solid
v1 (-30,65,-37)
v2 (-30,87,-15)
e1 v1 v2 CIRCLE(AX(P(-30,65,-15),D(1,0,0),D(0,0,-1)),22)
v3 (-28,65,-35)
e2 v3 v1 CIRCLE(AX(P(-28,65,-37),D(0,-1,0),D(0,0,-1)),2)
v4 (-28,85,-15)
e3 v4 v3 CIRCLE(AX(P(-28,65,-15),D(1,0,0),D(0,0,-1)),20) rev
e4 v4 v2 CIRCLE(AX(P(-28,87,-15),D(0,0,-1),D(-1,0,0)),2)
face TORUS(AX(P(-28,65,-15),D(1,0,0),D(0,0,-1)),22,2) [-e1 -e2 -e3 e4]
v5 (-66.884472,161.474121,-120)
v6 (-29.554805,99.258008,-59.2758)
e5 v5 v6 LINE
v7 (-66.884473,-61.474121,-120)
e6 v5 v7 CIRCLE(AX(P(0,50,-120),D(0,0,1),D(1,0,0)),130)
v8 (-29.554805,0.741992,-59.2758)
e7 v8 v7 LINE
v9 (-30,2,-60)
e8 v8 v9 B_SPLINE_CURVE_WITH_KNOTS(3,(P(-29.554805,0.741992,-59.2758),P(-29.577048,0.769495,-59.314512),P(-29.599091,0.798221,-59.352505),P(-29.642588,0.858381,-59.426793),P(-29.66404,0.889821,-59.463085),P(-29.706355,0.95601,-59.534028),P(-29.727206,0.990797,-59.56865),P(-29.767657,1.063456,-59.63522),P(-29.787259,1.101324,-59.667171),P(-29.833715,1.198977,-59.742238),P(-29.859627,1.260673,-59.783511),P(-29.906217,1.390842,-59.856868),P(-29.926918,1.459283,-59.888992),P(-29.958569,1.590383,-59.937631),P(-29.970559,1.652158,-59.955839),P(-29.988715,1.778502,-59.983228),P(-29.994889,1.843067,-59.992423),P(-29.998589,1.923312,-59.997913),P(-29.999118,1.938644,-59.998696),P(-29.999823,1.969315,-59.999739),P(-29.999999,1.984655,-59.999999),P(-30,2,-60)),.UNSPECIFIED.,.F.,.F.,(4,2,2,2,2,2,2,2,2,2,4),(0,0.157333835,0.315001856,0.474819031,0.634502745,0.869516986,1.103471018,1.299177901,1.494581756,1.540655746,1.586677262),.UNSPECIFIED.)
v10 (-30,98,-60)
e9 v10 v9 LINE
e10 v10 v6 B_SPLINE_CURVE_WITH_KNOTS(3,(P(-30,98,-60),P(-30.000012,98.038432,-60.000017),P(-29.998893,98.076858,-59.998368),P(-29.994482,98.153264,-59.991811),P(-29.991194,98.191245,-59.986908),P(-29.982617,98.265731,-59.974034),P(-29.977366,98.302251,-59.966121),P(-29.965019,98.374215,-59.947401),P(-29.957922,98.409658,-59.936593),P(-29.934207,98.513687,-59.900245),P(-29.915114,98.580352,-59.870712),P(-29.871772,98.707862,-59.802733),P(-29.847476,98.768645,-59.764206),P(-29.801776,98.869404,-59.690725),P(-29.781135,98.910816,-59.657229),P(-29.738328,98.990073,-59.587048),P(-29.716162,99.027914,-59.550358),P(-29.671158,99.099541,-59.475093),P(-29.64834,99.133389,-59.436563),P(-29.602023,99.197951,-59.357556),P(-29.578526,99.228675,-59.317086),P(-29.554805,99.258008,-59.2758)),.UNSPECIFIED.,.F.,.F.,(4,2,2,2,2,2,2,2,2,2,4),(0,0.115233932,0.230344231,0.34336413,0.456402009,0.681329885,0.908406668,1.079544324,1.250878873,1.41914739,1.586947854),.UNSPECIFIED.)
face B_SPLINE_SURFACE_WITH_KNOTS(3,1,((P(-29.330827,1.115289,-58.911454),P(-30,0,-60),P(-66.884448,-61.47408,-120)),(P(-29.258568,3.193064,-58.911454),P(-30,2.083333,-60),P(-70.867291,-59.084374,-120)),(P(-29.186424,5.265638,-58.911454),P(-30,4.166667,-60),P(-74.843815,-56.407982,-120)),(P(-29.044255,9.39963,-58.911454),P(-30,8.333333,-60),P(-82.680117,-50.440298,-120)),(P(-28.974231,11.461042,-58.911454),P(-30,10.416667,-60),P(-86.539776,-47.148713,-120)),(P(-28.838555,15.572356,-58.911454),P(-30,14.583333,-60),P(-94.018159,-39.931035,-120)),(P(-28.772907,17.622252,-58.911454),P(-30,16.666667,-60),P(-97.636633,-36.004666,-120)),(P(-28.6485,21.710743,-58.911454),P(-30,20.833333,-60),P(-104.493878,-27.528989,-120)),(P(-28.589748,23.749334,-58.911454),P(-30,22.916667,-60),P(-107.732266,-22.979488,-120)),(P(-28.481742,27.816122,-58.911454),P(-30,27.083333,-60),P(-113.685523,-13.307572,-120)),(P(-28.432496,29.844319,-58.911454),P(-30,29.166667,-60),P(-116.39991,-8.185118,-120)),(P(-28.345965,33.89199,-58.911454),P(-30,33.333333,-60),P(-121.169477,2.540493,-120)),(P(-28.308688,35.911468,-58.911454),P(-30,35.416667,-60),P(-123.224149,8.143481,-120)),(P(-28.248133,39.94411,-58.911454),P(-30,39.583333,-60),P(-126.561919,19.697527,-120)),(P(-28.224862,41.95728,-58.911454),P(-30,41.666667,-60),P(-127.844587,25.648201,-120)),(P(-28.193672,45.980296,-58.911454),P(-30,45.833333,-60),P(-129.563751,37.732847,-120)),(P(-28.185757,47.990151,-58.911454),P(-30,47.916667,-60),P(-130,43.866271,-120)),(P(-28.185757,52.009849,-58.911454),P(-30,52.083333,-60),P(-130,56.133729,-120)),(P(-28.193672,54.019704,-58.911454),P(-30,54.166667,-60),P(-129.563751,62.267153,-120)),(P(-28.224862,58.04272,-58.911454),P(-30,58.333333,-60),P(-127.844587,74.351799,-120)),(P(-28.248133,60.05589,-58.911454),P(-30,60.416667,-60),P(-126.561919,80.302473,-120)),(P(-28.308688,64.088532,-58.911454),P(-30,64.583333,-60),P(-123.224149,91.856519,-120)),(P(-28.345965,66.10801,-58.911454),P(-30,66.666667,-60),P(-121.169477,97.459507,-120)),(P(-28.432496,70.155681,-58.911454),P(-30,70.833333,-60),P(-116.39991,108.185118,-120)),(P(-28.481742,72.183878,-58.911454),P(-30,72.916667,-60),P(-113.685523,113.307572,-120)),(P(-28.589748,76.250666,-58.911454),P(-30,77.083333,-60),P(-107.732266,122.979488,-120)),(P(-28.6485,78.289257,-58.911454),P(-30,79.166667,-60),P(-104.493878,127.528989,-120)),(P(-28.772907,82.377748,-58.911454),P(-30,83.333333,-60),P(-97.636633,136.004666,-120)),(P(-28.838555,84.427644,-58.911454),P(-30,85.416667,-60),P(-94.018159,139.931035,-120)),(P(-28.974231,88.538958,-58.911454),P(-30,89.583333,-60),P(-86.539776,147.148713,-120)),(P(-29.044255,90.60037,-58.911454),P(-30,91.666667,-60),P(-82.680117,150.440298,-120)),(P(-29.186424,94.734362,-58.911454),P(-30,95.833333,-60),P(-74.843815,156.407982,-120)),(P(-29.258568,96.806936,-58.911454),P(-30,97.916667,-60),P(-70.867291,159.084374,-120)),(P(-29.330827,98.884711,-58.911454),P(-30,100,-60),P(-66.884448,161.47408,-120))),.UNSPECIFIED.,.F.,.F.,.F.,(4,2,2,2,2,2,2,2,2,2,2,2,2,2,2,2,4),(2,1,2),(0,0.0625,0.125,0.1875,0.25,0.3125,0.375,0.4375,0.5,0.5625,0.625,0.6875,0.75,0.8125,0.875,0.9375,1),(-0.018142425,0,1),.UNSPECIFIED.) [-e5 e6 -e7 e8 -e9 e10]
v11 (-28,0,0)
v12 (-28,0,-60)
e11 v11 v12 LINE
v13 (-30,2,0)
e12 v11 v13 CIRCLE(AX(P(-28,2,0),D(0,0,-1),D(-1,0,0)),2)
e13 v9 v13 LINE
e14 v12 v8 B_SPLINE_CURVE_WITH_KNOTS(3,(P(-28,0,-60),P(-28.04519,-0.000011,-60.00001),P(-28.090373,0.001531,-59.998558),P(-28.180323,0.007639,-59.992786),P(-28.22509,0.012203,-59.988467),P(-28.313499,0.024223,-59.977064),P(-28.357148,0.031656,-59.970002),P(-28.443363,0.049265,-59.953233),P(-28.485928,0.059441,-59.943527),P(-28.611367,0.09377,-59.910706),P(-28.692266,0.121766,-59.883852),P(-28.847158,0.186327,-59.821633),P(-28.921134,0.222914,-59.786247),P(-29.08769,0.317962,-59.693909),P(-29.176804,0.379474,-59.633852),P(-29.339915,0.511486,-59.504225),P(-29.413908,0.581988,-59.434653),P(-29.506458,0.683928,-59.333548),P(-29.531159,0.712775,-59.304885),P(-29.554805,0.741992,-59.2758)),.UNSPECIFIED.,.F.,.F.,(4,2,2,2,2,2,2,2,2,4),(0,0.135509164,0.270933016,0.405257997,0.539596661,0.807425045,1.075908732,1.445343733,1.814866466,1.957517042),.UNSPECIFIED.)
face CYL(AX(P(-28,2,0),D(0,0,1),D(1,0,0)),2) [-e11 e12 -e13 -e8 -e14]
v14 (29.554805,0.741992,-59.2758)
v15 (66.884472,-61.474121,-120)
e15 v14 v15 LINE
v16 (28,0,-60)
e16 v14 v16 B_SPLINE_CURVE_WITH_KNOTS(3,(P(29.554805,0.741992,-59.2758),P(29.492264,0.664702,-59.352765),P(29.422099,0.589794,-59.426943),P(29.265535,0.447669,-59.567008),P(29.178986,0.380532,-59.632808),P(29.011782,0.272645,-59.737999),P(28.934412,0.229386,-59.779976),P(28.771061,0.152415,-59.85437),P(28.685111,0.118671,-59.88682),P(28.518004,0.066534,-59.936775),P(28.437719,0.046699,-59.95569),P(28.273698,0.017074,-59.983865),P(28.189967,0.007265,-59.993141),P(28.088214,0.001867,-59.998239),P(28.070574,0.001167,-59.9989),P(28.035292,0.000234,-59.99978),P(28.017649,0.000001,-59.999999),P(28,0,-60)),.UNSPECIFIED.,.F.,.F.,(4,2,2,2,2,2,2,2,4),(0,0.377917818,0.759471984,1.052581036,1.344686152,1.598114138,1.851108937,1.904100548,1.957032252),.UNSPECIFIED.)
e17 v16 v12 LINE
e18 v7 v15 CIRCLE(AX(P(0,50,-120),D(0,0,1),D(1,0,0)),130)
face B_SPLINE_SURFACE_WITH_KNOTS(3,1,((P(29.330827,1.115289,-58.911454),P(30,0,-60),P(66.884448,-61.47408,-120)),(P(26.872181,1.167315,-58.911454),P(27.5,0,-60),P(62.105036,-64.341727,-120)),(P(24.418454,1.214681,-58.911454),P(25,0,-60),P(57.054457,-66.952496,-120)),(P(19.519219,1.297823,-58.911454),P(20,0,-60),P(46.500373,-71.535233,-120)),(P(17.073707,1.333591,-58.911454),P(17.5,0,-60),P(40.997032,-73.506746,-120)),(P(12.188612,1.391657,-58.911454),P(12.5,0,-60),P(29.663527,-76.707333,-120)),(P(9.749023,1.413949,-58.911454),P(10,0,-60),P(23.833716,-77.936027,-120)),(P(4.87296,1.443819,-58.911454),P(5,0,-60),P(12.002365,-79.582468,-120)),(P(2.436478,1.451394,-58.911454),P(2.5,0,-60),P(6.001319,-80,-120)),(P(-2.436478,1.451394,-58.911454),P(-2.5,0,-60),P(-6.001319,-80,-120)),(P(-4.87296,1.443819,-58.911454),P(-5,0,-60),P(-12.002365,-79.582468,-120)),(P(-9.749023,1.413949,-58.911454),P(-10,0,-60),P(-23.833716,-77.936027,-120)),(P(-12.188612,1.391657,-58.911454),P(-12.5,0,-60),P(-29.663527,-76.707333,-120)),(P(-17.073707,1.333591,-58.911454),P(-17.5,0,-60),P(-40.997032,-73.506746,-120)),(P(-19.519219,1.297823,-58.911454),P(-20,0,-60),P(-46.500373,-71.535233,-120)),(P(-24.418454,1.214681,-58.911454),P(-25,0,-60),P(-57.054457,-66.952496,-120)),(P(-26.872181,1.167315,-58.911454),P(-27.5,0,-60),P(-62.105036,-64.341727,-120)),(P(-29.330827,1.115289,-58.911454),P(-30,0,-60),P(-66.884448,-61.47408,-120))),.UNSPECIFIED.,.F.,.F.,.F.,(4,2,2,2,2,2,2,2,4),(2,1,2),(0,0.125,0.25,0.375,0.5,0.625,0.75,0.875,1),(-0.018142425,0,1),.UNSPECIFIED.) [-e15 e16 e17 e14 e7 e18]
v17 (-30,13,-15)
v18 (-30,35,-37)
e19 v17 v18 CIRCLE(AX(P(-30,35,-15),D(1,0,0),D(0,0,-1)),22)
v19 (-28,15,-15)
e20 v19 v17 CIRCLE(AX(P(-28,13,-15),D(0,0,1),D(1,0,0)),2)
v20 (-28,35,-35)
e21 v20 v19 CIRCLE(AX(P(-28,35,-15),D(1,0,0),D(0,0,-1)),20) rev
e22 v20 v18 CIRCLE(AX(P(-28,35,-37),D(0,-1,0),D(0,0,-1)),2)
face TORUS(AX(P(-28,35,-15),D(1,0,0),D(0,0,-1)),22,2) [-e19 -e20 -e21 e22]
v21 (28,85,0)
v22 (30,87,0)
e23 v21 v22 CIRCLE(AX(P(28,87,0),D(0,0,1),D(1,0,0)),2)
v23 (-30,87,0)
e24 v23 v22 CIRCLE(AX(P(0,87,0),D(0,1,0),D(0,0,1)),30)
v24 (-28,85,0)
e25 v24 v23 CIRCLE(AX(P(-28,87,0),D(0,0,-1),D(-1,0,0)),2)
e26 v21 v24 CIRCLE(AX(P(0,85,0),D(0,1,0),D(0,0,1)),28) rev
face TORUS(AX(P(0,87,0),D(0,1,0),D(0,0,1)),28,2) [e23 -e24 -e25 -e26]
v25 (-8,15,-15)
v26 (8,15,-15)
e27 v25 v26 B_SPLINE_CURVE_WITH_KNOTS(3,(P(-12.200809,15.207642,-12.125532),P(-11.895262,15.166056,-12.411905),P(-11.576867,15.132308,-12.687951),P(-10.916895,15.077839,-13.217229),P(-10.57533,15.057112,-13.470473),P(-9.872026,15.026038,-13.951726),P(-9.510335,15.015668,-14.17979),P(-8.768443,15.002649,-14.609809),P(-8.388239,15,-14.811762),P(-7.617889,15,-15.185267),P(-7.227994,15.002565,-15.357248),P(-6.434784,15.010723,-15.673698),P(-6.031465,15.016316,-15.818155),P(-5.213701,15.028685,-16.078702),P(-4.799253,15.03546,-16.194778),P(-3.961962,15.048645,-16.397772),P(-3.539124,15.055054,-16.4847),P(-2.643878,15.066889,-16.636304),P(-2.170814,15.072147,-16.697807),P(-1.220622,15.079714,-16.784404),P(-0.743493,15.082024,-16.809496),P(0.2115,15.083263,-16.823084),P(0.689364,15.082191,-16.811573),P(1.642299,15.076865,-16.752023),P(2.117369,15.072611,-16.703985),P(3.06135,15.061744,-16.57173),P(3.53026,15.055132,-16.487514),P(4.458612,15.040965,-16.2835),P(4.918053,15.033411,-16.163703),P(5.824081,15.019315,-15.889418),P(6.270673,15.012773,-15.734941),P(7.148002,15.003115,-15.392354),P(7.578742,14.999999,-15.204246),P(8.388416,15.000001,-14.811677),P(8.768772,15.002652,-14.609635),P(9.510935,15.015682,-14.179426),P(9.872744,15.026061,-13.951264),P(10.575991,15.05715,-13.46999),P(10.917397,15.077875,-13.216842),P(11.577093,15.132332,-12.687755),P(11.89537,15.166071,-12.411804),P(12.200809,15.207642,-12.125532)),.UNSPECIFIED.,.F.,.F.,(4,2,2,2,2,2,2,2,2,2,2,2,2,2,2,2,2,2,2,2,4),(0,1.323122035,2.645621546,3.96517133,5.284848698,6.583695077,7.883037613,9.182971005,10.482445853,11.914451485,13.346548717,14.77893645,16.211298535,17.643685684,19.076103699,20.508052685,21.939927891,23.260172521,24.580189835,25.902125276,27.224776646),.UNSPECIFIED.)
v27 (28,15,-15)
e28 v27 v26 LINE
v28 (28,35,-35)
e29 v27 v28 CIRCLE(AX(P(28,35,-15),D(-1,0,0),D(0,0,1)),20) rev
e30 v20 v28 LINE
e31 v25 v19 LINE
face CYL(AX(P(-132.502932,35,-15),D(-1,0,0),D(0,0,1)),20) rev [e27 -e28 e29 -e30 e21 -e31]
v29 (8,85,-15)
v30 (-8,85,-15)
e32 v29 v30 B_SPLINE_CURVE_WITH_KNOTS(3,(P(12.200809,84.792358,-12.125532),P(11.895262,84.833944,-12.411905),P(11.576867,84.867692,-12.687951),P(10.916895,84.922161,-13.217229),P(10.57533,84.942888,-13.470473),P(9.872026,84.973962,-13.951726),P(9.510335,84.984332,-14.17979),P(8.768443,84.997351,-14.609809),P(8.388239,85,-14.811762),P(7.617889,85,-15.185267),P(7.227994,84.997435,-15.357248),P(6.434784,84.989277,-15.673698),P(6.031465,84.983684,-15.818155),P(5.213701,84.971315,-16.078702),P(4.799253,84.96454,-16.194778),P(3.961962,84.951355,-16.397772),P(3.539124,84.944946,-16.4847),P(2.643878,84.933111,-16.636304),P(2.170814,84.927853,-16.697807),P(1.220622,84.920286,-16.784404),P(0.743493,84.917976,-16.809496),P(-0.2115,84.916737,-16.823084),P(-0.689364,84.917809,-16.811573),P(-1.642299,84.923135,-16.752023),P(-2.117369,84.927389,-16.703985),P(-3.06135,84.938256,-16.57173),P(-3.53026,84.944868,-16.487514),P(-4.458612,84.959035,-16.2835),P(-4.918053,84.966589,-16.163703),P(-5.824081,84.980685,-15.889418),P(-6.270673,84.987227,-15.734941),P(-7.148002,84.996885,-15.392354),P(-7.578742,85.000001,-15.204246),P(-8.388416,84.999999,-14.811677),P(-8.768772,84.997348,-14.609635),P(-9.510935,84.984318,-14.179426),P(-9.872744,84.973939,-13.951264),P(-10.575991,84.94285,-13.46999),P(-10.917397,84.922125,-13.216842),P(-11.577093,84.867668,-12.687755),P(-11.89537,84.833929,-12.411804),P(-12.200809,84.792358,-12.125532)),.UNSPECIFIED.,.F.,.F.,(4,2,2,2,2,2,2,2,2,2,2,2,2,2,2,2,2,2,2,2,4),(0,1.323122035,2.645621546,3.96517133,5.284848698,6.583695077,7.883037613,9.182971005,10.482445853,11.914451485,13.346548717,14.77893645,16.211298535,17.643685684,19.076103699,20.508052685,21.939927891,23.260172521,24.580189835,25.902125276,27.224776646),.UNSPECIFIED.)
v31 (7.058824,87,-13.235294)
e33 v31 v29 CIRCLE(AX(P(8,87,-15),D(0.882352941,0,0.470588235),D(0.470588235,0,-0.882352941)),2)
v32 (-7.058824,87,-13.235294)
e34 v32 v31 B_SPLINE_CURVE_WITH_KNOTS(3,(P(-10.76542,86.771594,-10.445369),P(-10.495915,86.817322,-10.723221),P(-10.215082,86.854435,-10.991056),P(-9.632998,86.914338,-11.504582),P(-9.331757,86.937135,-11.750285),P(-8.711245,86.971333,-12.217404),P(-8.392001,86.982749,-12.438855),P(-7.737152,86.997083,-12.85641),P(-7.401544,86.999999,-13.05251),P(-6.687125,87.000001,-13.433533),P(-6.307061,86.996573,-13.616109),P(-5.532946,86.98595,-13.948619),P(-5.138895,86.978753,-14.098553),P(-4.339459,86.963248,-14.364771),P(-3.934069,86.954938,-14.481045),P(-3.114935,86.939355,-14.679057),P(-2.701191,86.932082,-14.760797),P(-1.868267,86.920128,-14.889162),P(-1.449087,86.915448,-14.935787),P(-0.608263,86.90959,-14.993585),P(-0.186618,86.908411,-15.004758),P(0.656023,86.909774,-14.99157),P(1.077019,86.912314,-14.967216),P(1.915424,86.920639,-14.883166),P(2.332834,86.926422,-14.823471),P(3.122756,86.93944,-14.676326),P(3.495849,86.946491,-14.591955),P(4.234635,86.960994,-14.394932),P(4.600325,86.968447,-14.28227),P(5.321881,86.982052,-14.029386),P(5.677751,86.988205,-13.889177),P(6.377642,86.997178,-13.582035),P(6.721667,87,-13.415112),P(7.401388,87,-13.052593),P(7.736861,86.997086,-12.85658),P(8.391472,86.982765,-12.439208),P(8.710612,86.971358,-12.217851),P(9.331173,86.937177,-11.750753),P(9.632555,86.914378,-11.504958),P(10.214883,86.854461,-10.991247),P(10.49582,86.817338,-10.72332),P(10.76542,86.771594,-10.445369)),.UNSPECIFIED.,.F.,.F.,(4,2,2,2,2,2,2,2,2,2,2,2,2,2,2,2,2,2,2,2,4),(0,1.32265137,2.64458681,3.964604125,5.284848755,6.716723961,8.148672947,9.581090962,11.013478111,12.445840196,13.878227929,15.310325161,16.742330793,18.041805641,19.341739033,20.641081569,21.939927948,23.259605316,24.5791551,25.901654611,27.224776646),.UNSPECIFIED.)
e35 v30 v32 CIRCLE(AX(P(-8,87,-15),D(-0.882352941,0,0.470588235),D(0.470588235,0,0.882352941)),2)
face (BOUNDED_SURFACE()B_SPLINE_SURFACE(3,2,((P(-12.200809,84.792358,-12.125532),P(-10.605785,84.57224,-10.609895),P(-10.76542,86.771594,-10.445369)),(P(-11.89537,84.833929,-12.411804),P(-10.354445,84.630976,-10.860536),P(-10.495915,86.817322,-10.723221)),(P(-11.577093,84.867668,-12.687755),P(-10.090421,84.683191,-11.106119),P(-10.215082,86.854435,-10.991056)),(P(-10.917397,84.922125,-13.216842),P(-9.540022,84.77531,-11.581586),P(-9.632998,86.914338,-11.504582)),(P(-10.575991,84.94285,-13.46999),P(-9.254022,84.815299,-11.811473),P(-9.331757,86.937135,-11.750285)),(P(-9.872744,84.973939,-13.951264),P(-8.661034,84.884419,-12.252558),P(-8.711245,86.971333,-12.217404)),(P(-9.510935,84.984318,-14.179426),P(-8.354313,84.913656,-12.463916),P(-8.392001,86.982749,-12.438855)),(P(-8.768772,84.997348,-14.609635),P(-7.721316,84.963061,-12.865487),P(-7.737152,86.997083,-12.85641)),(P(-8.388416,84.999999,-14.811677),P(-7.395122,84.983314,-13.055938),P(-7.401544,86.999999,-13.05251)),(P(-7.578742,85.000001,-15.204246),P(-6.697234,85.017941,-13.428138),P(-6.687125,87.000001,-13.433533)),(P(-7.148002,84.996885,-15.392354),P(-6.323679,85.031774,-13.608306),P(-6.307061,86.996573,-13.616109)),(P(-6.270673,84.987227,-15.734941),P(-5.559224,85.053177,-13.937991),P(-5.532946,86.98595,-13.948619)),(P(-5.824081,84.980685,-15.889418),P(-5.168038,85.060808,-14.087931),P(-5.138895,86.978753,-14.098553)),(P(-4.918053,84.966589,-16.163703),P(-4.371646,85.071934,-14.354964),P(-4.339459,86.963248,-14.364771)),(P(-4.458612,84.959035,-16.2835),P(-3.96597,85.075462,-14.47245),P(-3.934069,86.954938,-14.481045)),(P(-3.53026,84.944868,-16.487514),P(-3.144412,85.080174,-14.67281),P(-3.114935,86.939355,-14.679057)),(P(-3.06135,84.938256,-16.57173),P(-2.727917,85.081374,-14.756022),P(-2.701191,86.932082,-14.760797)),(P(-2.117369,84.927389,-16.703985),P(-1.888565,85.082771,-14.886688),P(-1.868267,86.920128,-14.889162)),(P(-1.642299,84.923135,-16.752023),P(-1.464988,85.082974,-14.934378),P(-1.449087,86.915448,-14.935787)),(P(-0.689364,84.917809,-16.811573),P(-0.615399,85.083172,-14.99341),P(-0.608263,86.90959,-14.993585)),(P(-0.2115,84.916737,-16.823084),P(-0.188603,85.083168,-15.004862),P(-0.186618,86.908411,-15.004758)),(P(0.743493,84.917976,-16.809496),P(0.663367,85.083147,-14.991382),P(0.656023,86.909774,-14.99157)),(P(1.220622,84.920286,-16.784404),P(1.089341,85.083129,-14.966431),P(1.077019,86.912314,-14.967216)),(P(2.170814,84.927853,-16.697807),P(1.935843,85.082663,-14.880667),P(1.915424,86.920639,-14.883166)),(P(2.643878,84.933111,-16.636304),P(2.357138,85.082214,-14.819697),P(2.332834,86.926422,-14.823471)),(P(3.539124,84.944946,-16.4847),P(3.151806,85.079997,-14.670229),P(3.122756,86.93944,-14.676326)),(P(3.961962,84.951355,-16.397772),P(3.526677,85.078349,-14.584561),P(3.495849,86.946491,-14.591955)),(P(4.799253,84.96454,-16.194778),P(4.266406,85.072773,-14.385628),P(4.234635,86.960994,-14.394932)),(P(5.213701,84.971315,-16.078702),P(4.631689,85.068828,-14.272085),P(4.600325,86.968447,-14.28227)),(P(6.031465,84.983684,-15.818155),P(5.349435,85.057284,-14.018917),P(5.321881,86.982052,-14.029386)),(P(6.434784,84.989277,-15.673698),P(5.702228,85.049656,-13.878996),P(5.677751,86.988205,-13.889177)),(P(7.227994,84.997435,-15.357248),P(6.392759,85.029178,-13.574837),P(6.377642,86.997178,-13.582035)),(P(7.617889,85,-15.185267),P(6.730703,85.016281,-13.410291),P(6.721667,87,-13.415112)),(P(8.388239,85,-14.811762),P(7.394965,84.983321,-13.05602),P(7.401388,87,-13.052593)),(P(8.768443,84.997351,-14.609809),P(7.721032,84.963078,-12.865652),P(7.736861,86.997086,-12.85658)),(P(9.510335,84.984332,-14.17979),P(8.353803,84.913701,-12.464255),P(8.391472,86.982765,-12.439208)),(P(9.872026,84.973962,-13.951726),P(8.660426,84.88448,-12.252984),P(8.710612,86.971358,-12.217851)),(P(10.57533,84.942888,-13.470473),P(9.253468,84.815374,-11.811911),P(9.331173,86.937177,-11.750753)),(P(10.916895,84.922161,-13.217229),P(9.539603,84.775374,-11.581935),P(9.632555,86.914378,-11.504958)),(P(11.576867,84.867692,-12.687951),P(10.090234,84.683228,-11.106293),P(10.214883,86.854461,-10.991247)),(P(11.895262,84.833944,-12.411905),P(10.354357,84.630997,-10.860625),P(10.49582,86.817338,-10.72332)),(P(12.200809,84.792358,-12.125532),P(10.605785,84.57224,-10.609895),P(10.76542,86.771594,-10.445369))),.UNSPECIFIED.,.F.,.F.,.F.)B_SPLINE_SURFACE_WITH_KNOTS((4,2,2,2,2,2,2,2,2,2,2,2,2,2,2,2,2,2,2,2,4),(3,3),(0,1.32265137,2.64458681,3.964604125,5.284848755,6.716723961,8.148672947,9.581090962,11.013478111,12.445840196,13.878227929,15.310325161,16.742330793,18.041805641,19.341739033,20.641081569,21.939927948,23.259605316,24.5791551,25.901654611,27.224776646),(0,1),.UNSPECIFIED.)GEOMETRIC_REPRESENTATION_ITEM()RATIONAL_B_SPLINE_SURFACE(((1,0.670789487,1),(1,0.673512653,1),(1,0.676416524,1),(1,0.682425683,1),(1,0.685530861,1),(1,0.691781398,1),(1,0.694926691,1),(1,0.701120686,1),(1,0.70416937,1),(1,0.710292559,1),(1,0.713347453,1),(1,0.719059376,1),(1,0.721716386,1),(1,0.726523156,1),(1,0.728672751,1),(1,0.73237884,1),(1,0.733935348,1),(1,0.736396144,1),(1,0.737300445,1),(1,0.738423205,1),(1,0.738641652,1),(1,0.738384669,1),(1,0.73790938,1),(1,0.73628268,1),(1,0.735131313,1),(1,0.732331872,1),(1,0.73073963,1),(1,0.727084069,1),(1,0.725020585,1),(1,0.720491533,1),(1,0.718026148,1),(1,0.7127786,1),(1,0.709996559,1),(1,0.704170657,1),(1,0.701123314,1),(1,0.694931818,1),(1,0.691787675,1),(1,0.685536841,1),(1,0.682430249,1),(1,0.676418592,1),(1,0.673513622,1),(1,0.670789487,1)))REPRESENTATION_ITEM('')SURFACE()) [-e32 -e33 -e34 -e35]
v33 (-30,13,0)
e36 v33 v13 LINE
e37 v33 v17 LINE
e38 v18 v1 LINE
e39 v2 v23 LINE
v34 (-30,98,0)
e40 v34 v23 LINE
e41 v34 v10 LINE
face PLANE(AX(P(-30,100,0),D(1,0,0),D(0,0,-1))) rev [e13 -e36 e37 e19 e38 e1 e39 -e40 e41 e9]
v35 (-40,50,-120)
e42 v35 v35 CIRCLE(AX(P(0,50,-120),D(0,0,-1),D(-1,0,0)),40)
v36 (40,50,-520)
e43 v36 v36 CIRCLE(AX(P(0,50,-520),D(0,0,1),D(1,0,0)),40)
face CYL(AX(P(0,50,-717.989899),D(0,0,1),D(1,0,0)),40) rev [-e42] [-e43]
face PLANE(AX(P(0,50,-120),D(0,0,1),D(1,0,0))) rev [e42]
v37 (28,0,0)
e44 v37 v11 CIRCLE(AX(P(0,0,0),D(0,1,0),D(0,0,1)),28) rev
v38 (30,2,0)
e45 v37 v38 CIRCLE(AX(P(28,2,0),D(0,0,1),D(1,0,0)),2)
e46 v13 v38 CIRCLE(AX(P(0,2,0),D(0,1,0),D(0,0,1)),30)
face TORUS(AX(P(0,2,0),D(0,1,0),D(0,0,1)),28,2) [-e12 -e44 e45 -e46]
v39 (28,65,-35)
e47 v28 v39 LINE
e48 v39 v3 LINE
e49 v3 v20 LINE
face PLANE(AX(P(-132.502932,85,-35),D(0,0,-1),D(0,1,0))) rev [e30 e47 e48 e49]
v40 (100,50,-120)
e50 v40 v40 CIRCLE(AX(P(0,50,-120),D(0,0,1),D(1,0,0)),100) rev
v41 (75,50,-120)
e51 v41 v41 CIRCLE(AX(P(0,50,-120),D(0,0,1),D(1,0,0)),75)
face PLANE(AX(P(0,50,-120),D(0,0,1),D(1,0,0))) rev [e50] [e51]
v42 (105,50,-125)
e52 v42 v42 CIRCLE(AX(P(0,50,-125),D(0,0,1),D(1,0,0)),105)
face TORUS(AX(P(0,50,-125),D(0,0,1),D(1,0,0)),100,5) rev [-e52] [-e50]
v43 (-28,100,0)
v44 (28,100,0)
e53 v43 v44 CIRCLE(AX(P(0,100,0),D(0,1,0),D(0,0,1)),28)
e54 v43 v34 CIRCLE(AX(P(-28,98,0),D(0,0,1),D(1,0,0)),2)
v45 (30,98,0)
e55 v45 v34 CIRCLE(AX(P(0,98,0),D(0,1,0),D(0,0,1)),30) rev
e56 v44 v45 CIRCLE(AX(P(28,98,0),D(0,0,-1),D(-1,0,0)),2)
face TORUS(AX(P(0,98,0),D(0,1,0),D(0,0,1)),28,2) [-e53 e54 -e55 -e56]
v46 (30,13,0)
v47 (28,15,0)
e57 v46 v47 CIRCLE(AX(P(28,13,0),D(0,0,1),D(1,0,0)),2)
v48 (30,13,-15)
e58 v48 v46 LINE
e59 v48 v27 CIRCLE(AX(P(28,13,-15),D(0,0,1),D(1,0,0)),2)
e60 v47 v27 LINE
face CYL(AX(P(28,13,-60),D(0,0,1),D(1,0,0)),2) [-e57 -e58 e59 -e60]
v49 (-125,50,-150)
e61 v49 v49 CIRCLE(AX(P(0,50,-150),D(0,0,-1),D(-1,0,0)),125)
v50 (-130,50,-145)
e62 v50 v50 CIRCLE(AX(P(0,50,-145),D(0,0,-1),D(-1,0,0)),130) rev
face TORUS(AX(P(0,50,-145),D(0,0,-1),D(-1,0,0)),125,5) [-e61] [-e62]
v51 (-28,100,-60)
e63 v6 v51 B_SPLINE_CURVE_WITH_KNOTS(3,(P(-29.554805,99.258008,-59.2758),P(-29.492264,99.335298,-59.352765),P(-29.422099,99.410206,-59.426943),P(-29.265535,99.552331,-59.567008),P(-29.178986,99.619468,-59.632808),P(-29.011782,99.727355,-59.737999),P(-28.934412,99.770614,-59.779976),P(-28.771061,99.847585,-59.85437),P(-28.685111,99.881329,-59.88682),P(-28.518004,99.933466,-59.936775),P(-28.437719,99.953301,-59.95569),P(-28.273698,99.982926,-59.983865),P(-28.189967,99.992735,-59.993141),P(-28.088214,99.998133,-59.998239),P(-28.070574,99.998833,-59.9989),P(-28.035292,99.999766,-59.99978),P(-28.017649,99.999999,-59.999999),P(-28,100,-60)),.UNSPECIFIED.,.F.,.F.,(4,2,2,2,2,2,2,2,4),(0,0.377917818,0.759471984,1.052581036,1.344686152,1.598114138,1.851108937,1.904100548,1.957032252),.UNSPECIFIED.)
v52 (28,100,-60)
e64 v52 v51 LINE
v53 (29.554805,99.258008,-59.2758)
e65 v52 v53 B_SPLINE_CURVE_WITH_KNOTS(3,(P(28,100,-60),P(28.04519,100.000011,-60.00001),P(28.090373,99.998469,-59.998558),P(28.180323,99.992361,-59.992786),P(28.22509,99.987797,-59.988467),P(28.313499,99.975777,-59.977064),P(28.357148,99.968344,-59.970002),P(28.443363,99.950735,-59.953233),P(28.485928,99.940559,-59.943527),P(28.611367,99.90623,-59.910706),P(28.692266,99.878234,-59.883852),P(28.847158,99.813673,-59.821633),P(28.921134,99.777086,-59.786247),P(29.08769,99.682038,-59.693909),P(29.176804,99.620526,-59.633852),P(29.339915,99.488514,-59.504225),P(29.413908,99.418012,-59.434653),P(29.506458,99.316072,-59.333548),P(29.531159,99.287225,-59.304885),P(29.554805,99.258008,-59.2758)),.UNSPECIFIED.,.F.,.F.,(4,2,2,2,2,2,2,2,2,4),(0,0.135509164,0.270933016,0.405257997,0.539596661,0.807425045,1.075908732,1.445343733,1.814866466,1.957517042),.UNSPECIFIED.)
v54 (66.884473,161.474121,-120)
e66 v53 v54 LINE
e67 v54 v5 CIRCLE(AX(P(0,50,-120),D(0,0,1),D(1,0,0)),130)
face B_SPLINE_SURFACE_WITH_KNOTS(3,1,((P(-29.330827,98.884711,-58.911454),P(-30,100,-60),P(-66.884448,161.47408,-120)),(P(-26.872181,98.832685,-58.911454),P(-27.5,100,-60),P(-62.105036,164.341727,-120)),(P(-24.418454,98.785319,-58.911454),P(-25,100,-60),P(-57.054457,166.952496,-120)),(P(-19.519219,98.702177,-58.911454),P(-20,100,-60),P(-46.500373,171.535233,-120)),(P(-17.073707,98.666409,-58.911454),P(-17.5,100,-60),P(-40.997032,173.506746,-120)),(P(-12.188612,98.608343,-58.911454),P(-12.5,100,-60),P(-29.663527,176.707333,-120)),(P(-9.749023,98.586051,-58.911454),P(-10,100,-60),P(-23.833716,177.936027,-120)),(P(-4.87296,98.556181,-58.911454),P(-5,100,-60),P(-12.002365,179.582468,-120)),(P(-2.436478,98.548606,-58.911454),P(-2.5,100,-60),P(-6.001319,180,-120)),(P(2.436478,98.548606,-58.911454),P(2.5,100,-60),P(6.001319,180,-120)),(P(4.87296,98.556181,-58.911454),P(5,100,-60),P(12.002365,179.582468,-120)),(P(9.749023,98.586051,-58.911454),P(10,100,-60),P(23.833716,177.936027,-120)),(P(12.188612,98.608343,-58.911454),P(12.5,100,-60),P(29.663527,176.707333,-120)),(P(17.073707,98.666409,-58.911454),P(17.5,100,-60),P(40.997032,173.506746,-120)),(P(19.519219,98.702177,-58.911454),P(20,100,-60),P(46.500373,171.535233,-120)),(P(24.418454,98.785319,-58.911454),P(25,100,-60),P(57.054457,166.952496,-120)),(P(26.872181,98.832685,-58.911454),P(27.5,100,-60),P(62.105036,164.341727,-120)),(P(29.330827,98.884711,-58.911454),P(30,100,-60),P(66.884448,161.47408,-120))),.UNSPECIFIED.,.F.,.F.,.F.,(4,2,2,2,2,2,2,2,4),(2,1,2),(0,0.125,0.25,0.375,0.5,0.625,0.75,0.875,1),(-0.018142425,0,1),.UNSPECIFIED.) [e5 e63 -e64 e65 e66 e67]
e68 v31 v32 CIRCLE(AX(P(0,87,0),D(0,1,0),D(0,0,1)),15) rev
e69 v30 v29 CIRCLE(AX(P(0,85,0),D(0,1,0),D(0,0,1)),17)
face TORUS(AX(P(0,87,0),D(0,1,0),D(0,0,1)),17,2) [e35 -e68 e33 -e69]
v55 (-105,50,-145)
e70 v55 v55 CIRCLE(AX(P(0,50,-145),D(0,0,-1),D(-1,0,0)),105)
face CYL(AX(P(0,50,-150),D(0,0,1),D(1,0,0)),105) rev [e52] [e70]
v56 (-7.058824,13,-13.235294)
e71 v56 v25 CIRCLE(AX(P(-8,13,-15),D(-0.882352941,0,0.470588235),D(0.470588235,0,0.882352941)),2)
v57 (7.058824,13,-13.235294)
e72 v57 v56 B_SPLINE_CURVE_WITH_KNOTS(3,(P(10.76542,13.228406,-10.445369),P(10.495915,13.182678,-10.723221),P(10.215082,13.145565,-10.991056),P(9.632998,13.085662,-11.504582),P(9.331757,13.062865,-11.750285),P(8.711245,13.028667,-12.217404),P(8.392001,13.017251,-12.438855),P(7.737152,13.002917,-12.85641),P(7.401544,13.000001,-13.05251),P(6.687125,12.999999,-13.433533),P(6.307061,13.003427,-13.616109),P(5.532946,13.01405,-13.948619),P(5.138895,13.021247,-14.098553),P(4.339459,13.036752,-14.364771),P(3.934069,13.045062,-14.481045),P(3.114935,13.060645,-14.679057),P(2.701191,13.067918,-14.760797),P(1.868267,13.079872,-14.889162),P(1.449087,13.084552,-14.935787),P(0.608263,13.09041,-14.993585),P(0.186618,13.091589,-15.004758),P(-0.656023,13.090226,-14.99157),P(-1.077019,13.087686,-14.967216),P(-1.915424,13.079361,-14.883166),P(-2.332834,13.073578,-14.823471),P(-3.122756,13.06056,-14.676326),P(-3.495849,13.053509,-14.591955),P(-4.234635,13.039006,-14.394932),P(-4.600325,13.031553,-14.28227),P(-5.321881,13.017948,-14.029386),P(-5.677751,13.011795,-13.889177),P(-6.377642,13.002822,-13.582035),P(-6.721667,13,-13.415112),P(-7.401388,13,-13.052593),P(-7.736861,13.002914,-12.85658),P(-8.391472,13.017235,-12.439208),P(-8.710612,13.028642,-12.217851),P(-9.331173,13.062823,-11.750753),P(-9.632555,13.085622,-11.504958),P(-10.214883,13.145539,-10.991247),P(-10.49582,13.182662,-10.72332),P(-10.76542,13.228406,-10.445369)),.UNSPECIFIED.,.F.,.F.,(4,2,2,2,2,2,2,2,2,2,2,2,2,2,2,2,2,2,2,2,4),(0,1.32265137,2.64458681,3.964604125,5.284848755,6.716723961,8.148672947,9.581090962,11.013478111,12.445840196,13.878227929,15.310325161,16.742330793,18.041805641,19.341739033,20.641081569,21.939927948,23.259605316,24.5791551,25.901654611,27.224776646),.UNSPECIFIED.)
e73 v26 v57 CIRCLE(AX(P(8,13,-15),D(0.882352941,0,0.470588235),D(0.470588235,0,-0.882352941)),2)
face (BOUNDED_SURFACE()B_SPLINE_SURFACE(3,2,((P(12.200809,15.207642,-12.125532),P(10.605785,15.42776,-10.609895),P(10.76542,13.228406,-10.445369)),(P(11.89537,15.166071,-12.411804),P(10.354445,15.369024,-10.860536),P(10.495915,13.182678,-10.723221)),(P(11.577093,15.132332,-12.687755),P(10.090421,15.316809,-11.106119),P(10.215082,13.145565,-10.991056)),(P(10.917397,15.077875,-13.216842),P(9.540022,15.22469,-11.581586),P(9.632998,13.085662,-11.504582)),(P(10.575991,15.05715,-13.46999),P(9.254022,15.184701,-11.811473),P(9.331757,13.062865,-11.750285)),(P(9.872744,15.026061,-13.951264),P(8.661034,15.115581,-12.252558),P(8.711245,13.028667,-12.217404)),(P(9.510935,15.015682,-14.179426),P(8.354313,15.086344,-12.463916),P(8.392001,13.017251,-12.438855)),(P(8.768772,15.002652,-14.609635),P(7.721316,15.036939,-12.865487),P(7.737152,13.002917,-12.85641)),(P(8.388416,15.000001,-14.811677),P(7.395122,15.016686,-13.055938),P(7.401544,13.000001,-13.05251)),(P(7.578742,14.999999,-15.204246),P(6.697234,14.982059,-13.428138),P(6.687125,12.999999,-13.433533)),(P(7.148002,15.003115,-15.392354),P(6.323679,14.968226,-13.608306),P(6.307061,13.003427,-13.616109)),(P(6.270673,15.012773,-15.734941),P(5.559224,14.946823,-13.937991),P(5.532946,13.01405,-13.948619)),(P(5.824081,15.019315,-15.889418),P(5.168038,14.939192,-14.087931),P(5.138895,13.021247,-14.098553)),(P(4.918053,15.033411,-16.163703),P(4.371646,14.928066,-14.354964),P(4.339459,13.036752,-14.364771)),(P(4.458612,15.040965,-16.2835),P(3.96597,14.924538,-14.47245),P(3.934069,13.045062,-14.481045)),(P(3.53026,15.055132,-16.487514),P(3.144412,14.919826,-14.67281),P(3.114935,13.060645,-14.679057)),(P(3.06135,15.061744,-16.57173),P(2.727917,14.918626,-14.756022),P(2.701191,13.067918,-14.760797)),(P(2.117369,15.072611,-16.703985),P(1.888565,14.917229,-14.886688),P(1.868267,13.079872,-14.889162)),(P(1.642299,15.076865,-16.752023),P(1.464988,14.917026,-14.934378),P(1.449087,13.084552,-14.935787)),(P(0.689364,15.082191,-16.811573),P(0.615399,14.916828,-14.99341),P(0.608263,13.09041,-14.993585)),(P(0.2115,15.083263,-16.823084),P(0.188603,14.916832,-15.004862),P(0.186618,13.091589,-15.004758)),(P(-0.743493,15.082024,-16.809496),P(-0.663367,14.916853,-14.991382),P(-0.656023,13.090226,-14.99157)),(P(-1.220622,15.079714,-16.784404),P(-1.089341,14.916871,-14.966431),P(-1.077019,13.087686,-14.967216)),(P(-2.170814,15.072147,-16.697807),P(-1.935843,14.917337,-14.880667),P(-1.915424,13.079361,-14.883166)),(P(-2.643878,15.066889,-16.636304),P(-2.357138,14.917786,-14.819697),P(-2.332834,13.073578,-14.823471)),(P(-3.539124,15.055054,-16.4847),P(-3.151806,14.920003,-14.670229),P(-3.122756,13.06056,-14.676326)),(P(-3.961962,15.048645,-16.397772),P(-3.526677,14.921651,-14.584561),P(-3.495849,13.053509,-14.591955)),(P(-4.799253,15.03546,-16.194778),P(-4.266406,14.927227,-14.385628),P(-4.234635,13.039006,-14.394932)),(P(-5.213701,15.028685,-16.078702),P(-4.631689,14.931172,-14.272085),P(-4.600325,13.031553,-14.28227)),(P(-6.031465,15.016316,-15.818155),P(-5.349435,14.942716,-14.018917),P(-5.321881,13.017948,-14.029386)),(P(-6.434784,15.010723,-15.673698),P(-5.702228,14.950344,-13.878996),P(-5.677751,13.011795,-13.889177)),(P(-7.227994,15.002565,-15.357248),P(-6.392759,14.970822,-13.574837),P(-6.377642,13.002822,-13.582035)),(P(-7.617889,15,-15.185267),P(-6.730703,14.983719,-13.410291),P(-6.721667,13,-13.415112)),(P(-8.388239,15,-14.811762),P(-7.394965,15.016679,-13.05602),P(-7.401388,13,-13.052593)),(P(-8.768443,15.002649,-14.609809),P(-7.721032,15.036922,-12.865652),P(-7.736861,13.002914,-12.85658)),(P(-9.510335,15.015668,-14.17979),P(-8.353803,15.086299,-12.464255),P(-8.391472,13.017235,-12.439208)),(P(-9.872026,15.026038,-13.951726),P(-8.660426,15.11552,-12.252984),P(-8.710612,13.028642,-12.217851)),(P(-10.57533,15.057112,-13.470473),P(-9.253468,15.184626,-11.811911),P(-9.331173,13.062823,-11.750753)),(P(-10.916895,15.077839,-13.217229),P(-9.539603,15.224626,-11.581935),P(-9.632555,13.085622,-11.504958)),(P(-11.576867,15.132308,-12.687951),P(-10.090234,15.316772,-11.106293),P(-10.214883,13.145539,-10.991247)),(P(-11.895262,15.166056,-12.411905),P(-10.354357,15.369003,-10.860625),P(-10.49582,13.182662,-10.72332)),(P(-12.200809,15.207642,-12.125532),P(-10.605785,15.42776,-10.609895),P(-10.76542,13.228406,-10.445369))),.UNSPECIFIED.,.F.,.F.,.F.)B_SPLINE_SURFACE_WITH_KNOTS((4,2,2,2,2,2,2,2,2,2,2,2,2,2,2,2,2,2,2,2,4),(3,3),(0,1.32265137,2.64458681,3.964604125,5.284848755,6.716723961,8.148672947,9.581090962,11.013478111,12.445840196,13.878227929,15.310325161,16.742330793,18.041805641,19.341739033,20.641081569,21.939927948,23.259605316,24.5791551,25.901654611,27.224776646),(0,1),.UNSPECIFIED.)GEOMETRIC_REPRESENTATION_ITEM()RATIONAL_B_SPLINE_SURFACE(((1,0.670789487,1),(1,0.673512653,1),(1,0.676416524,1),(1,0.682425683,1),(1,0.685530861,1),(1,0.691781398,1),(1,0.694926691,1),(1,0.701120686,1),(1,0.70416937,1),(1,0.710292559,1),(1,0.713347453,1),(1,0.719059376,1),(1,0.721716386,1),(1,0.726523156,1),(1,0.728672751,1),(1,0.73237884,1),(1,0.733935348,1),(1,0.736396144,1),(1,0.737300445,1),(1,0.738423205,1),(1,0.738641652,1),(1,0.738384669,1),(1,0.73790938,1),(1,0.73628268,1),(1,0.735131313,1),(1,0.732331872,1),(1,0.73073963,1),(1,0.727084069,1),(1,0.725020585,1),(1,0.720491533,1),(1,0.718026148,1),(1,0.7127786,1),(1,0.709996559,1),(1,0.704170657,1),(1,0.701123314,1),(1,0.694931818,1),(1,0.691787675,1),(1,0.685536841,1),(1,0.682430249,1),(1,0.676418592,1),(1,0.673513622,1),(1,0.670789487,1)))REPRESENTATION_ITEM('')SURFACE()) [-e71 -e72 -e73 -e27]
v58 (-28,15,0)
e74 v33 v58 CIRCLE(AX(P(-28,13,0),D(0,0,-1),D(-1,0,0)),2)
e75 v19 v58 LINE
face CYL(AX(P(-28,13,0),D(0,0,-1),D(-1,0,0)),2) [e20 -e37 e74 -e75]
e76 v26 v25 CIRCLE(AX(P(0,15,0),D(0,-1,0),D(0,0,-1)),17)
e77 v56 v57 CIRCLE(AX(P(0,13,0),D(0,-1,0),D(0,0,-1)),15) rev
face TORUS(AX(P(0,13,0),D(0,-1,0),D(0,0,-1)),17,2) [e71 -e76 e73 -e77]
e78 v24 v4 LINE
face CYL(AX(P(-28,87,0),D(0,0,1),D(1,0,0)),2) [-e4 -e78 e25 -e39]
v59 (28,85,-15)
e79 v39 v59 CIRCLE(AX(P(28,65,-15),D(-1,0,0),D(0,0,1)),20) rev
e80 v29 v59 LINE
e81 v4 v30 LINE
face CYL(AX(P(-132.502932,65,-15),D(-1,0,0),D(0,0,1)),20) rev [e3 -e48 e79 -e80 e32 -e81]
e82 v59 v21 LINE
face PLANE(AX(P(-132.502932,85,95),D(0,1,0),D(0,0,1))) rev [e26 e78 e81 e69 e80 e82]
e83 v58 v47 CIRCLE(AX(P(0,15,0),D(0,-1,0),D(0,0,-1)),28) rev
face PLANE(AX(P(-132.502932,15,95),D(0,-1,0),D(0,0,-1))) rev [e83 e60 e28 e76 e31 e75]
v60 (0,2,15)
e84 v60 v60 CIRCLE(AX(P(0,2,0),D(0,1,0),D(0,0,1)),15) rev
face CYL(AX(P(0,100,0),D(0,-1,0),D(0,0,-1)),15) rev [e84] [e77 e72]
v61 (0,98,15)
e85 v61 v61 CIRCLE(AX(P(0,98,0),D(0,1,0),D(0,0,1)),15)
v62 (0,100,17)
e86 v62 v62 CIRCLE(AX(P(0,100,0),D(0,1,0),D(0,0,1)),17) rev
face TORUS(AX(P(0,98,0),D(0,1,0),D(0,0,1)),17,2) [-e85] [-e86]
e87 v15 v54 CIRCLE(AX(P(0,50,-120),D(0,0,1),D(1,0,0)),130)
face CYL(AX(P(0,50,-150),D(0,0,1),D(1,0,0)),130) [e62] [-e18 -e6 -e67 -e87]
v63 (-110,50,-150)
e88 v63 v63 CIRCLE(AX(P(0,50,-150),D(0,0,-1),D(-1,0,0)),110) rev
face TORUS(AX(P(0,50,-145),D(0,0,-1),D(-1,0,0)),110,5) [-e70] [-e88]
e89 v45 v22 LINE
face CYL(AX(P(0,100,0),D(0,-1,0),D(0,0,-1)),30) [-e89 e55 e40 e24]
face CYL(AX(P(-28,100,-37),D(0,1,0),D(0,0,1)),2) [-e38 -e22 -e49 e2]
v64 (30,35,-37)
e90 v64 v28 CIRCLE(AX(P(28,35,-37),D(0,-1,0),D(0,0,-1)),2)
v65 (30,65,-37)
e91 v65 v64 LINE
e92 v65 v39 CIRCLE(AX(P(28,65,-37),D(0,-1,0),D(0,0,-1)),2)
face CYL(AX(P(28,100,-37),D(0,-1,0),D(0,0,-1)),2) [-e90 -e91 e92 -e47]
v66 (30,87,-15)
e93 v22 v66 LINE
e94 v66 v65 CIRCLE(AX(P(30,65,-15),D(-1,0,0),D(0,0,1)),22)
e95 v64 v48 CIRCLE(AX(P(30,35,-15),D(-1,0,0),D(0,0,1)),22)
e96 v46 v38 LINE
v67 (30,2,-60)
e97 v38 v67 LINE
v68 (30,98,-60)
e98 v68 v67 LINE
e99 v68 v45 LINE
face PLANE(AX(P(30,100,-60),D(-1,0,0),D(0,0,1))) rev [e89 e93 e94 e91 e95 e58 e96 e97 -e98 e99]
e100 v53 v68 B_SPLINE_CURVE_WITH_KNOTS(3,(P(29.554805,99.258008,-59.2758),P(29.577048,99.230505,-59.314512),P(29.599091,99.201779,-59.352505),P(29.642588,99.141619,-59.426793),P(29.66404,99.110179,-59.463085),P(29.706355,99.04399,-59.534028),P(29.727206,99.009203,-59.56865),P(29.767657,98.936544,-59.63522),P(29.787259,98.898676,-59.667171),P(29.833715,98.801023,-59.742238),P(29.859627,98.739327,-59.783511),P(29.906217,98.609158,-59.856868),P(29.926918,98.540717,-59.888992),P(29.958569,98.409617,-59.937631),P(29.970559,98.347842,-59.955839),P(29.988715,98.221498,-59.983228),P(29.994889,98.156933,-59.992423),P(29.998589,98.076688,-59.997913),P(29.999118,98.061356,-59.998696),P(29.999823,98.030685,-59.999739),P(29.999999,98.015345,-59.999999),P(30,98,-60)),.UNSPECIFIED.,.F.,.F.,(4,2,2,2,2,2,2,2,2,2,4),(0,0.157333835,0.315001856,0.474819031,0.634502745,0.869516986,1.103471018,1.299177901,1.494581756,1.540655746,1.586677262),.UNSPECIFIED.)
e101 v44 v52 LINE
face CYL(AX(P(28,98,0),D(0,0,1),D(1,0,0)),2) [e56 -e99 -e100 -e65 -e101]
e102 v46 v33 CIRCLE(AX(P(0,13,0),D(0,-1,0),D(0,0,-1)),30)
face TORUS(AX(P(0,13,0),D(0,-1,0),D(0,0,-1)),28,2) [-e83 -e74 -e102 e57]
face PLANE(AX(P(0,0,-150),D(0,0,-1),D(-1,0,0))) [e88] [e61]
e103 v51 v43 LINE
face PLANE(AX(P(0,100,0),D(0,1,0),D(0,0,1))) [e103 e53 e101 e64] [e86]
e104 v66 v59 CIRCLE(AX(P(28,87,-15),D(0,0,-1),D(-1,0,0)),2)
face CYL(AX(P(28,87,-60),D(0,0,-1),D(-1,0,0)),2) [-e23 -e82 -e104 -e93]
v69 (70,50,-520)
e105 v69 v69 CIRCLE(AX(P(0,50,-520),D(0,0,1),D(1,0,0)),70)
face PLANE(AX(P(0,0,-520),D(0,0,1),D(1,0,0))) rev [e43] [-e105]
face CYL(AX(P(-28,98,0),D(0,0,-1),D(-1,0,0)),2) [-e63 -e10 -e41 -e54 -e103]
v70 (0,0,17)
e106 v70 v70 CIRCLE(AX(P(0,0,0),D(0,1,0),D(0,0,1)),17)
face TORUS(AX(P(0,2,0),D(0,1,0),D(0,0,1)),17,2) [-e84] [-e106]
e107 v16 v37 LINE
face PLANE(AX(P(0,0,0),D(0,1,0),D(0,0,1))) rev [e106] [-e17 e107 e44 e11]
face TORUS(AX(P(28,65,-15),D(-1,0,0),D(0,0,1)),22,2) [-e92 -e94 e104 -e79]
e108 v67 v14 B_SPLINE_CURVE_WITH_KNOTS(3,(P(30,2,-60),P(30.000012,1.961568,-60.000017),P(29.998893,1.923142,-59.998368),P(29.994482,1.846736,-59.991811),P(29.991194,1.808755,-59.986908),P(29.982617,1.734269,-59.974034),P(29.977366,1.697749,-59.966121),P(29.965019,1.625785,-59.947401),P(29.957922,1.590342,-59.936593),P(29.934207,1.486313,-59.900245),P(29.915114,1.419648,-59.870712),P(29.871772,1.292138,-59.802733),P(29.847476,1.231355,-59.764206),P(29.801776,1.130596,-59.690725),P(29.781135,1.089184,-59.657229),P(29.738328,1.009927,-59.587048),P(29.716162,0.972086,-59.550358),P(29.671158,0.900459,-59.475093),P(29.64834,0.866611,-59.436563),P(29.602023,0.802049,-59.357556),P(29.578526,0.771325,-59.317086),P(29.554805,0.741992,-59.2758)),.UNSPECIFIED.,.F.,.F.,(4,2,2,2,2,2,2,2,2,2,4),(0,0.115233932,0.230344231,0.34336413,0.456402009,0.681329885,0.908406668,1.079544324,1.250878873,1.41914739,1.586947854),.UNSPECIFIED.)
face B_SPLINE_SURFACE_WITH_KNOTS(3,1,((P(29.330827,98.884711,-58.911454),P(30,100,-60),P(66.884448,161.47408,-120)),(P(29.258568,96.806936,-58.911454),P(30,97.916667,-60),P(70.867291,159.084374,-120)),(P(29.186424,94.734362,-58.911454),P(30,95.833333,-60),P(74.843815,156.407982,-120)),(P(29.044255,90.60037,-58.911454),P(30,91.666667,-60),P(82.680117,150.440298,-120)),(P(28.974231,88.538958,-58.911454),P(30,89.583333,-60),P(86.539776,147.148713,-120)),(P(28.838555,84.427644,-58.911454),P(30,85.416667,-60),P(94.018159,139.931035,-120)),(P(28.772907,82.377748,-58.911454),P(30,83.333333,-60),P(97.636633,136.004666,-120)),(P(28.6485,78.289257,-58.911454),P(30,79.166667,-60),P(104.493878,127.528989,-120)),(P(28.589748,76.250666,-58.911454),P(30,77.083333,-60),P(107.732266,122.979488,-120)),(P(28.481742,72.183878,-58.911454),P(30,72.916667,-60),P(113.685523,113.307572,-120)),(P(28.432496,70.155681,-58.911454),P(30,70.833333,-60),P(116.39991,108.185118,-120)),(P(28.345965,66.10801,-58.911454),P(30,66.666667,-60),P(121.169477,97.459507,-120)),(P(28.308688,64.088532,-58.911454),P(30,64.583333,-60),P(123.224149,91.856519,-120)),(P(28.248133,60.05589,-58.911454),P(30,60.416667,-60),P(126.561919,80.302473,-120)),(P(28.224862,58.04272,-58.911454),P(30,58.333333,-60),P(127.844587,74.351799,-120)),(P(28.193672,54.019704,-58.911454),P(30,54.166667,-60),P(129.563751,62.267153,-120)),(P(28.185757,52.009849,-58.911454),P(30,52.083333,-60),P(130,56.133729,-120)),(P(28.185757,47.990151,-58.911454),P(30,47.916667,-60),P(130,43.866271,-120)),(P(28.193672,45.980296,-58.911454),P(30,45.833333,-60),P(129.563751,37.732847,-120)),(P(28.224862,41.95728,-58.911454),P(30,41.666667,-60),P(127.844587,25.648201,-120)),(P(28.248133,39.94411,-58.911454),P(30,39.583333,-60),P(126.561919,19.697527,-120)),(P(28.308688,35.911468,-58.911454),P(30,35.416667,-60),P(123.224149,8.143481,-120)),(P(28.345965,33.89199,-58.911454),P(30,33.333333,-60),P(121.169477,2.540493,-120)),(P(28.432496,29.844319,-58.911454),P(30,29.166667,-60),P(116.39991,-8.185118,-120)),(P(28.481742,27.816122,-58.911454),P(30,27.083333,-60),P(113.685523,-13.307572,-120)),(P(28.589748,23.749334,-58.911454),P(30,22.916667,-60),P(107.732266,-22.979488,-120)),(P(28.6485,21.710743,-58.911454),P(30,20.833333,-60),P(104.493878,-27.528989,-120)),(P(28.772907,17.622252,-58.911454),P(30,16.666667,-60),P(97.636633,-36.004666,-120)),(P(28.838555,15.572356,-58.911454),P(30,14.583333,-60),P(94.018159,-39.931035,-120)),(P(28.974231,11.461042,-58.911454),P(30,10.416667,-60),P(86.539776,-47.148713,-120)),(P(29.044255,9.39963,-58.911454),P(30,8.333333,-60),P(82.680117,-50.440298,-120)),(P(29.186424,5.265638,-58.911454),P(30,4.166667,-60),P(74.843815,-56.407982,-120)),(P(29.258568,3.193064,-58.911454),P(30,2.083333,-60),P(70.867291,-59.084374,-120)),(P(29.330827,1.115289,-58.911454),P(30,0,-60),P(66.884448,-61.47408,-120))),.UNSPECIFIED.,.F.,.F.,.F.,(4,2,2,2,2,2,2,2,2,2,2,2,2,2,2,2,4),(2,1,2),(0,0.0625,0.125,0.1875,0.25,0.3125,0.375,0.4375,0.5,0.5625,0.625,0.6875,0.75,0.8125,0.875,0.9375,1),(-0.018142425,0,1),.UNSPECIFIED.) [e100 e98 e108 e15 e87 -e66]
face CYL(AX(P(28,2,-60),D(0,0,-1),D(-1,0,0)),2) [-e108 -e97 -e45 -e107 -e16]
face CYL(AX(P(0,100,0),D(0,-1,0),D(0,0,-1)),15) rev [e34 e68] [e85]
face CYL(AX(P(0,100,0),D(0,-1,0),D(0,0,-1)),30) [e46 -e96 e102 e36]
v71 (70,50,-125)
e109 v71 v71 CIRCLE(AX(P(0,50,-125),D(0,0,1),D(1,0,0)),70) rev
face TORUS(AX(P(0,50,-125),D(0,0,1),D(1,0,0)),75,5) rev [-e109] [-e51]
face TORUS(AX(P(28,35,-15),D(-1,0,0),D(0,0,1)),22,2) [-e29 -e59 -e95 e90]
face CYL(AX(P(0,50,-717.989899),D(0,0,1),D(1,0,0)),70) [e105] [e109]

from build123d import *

# Parameters (mm, degrees)
SKETCH1_R                 = 15
BOSS_EXTRUDE1_DEPTH       = 100
BOSS_EXTRUDE2_OUTLINE_R   = 130
BOSS_EXTRUDE2_OUTLINE_R_2 = 105
BOSS_EXTRUDE2_DEPTH       = 30
SKETCH9_R                 = 70
SKETCH9_R_2               = 40
BOSS_EXTRUDE3_DEPTH       = 400
CUT_EXTRUDE1_DEPTH        = 566.420197784
CUT_EXTRUDE1_DEPTH_BACK   = 566.420197784
SKETCH10_W                = 130
SKETCH10_H                = 70
FILLET1_R                 = 20
FILLET2_R                 = 2
FILLET3_R                 = 5


with BuildPart() as part:
    # Sketch1 → Boss-Extrude1 (new body)
    with BuildSketch(Plane(origin=(0, 0, 0), x_dir=(1, 0, 0), z_dir=(0, 1, 0))):
        with BuildLine():
            Line((-30, 0), (-30, 60))
            Line((-30, 60), (30, 60))
            Line((30, 60), (30, 0))
            ThreePointArc((30, 0), (0, -30), (-30, 0))
        make_face()
        with Locations(Location((0, 0, 0), (0, 0, 270))):
            Circle(SKETCH1_R, mode=Mode.SUBTRACT)
    extrude(amount=BOSS_EXTRUDE1_DEPTH)

    # Sketch2 → Loft2 section 0
    with BuildSketch(Plane(origin=(0, 0, -60), x_dir=(-1, 0, 0), z_dir=(0, 0, -1))):
        with BuildLine():
            Line((-30, 0), (30, 0))
            Line((30, 0), (30, 100))
            Line((30, 100), (-30, 100))
            Line((-30, 100), (-30, 0))
        make_face()
    # Sketch3 for Loft2 → Loft2 section 1
    with BuildSketch(Plane.XY.offset(-120)):
        with BuildLine():
            # circular arc as an exact rational Bezier (weights 1, cos(half-angle), 1)
            Bezier((66.884448206, -61.474080343), (0, -101.604749265), (-66.884448206, -61.474080343), weights=[1, 0.857492926, 1])
            Bezier((-66.884448206, -61.474080343), (-252.674582107, 50), (-66.884448206, 161.474080343), weights=[1, 0.514495755, 1])
            Bezier((-66.884448206, 161.474080343), (0, 201.604749265), (66.884448206, 161.474080343), weights=[1, 0.857492926, 1])
            Bezier((66.884448206, 161.474080343), (252.674582107, 50), (66.884448206, -61.474080343), weights=[1, 0.514495755, 1])
        make_face()
    loft()

    # Boss-Extrude2: read off the stored shape, not the designer's step
    # Boss-Extrude2 outline → Boss-Extrude2 (add)
    with BuildSketch(Plane(origin=(0, 0, -120), x_dir=(-1, 0, 0), z_dir=(0, 0, -1))):
        with Locations((0, 50)):
            Circle(BOSS_EXTRUDE2_OUTLINE_R)
        with Locations((0, 50)):
            Circle(BOSS_EXTRUDE2_OUTLINE_R_2, mode=Mode.SUBTRACT)
    extrude(amount=BOSS_EXTRUDE2_DEPTH)

    # Sketch9 → Boss-Extrude3 (add)
    with BuildSketch(Plane(origin=(0, 0, -120), x_dir=(-1, 0, 0), z_dir=(0, 0, -1))):
        with Locations(Location((0, 50, 0), (0, 0, 180))):
            Circle(SKETCH9_R)
        with Locations(Location((0, 50, 0), (0, 0, 180))):
            Circle(SKETCH9_R_2, mode=Mode.SUBTRACT)
    extrude(amount=BOSS_EXTRUDE3_DEPTH)

    # Sketch10 → Cut-Extrude1 (cut, two sides: drawn at the far end of the back side and taken through both)
    with BuildSketch(Plane(origin=(0, 0, 0), x_dir=(0, 0, -1), z_dir=(1, 0, 0)).offset(-CUT_EXTRUDE1_DEPTH_BACK)):
        with Locations((-30, 50)):
            Rectangle(SKETCH10_W, SKETCH10_H)
    extrude(amount=CUT_EXTRUDE1_DEPTH + CUT_EXTRUDE1_DEPTH_BACK, mode=Mode.SUBTRACT)

    # Fillet1
    fillet1_edges = [part.edges().sort_by_distance(p)[0] for p in [
        (0, 85, -35),
        (0, 15, -35),
    ]]
    fillet(fillet1_edges, radius=FILLET1_R - 0.0001)  # a hair under: the kernel refuses the full size

    # Fillet2
    fillet2_edges = [part.edges().sort_by_distance(p)[0] for p in [
        (0, 0, -15),
        (0, 100, -15),
        (-30, 100, -30),
        (0, 100, 30),
        (-30, 0, -30),
        (30, 0, -30),
        (0, 0, 30),
        (0, 15, 30),
        (-30, 15, -7.50005),
        (0, 15, -15),
        (0, 85, 30),
        (30, 85, -7.50005),
        (0, 85, -15),
        (30, 100, -30),
        (-30, 50, -35),
        (30, 50, -35),
        (30, 15, -7.50005),
        (-30, 85, -7.50005),
        (30, 20.857835087, -29.142164913),
        (-30, 20.857835087, -29.142164913),
        (30, 79.142164913, -29.142164913),
        (-30, 79.142164913, -29.142164913),
    ]]
    fillet(fillet2_edges, radius=FILLET2_R)

    # Fillet3
    fillet3_edges = [part.edges().sort_by_distance(p)[0] for p in [
        (130, 50, -150),
        (105, 50, -150),
        (105, 50, -120),
        (-70, 50, -120),
    ]]
    fillet(fillet3_edges, radius=FILLET3_R)


solid = part.part
